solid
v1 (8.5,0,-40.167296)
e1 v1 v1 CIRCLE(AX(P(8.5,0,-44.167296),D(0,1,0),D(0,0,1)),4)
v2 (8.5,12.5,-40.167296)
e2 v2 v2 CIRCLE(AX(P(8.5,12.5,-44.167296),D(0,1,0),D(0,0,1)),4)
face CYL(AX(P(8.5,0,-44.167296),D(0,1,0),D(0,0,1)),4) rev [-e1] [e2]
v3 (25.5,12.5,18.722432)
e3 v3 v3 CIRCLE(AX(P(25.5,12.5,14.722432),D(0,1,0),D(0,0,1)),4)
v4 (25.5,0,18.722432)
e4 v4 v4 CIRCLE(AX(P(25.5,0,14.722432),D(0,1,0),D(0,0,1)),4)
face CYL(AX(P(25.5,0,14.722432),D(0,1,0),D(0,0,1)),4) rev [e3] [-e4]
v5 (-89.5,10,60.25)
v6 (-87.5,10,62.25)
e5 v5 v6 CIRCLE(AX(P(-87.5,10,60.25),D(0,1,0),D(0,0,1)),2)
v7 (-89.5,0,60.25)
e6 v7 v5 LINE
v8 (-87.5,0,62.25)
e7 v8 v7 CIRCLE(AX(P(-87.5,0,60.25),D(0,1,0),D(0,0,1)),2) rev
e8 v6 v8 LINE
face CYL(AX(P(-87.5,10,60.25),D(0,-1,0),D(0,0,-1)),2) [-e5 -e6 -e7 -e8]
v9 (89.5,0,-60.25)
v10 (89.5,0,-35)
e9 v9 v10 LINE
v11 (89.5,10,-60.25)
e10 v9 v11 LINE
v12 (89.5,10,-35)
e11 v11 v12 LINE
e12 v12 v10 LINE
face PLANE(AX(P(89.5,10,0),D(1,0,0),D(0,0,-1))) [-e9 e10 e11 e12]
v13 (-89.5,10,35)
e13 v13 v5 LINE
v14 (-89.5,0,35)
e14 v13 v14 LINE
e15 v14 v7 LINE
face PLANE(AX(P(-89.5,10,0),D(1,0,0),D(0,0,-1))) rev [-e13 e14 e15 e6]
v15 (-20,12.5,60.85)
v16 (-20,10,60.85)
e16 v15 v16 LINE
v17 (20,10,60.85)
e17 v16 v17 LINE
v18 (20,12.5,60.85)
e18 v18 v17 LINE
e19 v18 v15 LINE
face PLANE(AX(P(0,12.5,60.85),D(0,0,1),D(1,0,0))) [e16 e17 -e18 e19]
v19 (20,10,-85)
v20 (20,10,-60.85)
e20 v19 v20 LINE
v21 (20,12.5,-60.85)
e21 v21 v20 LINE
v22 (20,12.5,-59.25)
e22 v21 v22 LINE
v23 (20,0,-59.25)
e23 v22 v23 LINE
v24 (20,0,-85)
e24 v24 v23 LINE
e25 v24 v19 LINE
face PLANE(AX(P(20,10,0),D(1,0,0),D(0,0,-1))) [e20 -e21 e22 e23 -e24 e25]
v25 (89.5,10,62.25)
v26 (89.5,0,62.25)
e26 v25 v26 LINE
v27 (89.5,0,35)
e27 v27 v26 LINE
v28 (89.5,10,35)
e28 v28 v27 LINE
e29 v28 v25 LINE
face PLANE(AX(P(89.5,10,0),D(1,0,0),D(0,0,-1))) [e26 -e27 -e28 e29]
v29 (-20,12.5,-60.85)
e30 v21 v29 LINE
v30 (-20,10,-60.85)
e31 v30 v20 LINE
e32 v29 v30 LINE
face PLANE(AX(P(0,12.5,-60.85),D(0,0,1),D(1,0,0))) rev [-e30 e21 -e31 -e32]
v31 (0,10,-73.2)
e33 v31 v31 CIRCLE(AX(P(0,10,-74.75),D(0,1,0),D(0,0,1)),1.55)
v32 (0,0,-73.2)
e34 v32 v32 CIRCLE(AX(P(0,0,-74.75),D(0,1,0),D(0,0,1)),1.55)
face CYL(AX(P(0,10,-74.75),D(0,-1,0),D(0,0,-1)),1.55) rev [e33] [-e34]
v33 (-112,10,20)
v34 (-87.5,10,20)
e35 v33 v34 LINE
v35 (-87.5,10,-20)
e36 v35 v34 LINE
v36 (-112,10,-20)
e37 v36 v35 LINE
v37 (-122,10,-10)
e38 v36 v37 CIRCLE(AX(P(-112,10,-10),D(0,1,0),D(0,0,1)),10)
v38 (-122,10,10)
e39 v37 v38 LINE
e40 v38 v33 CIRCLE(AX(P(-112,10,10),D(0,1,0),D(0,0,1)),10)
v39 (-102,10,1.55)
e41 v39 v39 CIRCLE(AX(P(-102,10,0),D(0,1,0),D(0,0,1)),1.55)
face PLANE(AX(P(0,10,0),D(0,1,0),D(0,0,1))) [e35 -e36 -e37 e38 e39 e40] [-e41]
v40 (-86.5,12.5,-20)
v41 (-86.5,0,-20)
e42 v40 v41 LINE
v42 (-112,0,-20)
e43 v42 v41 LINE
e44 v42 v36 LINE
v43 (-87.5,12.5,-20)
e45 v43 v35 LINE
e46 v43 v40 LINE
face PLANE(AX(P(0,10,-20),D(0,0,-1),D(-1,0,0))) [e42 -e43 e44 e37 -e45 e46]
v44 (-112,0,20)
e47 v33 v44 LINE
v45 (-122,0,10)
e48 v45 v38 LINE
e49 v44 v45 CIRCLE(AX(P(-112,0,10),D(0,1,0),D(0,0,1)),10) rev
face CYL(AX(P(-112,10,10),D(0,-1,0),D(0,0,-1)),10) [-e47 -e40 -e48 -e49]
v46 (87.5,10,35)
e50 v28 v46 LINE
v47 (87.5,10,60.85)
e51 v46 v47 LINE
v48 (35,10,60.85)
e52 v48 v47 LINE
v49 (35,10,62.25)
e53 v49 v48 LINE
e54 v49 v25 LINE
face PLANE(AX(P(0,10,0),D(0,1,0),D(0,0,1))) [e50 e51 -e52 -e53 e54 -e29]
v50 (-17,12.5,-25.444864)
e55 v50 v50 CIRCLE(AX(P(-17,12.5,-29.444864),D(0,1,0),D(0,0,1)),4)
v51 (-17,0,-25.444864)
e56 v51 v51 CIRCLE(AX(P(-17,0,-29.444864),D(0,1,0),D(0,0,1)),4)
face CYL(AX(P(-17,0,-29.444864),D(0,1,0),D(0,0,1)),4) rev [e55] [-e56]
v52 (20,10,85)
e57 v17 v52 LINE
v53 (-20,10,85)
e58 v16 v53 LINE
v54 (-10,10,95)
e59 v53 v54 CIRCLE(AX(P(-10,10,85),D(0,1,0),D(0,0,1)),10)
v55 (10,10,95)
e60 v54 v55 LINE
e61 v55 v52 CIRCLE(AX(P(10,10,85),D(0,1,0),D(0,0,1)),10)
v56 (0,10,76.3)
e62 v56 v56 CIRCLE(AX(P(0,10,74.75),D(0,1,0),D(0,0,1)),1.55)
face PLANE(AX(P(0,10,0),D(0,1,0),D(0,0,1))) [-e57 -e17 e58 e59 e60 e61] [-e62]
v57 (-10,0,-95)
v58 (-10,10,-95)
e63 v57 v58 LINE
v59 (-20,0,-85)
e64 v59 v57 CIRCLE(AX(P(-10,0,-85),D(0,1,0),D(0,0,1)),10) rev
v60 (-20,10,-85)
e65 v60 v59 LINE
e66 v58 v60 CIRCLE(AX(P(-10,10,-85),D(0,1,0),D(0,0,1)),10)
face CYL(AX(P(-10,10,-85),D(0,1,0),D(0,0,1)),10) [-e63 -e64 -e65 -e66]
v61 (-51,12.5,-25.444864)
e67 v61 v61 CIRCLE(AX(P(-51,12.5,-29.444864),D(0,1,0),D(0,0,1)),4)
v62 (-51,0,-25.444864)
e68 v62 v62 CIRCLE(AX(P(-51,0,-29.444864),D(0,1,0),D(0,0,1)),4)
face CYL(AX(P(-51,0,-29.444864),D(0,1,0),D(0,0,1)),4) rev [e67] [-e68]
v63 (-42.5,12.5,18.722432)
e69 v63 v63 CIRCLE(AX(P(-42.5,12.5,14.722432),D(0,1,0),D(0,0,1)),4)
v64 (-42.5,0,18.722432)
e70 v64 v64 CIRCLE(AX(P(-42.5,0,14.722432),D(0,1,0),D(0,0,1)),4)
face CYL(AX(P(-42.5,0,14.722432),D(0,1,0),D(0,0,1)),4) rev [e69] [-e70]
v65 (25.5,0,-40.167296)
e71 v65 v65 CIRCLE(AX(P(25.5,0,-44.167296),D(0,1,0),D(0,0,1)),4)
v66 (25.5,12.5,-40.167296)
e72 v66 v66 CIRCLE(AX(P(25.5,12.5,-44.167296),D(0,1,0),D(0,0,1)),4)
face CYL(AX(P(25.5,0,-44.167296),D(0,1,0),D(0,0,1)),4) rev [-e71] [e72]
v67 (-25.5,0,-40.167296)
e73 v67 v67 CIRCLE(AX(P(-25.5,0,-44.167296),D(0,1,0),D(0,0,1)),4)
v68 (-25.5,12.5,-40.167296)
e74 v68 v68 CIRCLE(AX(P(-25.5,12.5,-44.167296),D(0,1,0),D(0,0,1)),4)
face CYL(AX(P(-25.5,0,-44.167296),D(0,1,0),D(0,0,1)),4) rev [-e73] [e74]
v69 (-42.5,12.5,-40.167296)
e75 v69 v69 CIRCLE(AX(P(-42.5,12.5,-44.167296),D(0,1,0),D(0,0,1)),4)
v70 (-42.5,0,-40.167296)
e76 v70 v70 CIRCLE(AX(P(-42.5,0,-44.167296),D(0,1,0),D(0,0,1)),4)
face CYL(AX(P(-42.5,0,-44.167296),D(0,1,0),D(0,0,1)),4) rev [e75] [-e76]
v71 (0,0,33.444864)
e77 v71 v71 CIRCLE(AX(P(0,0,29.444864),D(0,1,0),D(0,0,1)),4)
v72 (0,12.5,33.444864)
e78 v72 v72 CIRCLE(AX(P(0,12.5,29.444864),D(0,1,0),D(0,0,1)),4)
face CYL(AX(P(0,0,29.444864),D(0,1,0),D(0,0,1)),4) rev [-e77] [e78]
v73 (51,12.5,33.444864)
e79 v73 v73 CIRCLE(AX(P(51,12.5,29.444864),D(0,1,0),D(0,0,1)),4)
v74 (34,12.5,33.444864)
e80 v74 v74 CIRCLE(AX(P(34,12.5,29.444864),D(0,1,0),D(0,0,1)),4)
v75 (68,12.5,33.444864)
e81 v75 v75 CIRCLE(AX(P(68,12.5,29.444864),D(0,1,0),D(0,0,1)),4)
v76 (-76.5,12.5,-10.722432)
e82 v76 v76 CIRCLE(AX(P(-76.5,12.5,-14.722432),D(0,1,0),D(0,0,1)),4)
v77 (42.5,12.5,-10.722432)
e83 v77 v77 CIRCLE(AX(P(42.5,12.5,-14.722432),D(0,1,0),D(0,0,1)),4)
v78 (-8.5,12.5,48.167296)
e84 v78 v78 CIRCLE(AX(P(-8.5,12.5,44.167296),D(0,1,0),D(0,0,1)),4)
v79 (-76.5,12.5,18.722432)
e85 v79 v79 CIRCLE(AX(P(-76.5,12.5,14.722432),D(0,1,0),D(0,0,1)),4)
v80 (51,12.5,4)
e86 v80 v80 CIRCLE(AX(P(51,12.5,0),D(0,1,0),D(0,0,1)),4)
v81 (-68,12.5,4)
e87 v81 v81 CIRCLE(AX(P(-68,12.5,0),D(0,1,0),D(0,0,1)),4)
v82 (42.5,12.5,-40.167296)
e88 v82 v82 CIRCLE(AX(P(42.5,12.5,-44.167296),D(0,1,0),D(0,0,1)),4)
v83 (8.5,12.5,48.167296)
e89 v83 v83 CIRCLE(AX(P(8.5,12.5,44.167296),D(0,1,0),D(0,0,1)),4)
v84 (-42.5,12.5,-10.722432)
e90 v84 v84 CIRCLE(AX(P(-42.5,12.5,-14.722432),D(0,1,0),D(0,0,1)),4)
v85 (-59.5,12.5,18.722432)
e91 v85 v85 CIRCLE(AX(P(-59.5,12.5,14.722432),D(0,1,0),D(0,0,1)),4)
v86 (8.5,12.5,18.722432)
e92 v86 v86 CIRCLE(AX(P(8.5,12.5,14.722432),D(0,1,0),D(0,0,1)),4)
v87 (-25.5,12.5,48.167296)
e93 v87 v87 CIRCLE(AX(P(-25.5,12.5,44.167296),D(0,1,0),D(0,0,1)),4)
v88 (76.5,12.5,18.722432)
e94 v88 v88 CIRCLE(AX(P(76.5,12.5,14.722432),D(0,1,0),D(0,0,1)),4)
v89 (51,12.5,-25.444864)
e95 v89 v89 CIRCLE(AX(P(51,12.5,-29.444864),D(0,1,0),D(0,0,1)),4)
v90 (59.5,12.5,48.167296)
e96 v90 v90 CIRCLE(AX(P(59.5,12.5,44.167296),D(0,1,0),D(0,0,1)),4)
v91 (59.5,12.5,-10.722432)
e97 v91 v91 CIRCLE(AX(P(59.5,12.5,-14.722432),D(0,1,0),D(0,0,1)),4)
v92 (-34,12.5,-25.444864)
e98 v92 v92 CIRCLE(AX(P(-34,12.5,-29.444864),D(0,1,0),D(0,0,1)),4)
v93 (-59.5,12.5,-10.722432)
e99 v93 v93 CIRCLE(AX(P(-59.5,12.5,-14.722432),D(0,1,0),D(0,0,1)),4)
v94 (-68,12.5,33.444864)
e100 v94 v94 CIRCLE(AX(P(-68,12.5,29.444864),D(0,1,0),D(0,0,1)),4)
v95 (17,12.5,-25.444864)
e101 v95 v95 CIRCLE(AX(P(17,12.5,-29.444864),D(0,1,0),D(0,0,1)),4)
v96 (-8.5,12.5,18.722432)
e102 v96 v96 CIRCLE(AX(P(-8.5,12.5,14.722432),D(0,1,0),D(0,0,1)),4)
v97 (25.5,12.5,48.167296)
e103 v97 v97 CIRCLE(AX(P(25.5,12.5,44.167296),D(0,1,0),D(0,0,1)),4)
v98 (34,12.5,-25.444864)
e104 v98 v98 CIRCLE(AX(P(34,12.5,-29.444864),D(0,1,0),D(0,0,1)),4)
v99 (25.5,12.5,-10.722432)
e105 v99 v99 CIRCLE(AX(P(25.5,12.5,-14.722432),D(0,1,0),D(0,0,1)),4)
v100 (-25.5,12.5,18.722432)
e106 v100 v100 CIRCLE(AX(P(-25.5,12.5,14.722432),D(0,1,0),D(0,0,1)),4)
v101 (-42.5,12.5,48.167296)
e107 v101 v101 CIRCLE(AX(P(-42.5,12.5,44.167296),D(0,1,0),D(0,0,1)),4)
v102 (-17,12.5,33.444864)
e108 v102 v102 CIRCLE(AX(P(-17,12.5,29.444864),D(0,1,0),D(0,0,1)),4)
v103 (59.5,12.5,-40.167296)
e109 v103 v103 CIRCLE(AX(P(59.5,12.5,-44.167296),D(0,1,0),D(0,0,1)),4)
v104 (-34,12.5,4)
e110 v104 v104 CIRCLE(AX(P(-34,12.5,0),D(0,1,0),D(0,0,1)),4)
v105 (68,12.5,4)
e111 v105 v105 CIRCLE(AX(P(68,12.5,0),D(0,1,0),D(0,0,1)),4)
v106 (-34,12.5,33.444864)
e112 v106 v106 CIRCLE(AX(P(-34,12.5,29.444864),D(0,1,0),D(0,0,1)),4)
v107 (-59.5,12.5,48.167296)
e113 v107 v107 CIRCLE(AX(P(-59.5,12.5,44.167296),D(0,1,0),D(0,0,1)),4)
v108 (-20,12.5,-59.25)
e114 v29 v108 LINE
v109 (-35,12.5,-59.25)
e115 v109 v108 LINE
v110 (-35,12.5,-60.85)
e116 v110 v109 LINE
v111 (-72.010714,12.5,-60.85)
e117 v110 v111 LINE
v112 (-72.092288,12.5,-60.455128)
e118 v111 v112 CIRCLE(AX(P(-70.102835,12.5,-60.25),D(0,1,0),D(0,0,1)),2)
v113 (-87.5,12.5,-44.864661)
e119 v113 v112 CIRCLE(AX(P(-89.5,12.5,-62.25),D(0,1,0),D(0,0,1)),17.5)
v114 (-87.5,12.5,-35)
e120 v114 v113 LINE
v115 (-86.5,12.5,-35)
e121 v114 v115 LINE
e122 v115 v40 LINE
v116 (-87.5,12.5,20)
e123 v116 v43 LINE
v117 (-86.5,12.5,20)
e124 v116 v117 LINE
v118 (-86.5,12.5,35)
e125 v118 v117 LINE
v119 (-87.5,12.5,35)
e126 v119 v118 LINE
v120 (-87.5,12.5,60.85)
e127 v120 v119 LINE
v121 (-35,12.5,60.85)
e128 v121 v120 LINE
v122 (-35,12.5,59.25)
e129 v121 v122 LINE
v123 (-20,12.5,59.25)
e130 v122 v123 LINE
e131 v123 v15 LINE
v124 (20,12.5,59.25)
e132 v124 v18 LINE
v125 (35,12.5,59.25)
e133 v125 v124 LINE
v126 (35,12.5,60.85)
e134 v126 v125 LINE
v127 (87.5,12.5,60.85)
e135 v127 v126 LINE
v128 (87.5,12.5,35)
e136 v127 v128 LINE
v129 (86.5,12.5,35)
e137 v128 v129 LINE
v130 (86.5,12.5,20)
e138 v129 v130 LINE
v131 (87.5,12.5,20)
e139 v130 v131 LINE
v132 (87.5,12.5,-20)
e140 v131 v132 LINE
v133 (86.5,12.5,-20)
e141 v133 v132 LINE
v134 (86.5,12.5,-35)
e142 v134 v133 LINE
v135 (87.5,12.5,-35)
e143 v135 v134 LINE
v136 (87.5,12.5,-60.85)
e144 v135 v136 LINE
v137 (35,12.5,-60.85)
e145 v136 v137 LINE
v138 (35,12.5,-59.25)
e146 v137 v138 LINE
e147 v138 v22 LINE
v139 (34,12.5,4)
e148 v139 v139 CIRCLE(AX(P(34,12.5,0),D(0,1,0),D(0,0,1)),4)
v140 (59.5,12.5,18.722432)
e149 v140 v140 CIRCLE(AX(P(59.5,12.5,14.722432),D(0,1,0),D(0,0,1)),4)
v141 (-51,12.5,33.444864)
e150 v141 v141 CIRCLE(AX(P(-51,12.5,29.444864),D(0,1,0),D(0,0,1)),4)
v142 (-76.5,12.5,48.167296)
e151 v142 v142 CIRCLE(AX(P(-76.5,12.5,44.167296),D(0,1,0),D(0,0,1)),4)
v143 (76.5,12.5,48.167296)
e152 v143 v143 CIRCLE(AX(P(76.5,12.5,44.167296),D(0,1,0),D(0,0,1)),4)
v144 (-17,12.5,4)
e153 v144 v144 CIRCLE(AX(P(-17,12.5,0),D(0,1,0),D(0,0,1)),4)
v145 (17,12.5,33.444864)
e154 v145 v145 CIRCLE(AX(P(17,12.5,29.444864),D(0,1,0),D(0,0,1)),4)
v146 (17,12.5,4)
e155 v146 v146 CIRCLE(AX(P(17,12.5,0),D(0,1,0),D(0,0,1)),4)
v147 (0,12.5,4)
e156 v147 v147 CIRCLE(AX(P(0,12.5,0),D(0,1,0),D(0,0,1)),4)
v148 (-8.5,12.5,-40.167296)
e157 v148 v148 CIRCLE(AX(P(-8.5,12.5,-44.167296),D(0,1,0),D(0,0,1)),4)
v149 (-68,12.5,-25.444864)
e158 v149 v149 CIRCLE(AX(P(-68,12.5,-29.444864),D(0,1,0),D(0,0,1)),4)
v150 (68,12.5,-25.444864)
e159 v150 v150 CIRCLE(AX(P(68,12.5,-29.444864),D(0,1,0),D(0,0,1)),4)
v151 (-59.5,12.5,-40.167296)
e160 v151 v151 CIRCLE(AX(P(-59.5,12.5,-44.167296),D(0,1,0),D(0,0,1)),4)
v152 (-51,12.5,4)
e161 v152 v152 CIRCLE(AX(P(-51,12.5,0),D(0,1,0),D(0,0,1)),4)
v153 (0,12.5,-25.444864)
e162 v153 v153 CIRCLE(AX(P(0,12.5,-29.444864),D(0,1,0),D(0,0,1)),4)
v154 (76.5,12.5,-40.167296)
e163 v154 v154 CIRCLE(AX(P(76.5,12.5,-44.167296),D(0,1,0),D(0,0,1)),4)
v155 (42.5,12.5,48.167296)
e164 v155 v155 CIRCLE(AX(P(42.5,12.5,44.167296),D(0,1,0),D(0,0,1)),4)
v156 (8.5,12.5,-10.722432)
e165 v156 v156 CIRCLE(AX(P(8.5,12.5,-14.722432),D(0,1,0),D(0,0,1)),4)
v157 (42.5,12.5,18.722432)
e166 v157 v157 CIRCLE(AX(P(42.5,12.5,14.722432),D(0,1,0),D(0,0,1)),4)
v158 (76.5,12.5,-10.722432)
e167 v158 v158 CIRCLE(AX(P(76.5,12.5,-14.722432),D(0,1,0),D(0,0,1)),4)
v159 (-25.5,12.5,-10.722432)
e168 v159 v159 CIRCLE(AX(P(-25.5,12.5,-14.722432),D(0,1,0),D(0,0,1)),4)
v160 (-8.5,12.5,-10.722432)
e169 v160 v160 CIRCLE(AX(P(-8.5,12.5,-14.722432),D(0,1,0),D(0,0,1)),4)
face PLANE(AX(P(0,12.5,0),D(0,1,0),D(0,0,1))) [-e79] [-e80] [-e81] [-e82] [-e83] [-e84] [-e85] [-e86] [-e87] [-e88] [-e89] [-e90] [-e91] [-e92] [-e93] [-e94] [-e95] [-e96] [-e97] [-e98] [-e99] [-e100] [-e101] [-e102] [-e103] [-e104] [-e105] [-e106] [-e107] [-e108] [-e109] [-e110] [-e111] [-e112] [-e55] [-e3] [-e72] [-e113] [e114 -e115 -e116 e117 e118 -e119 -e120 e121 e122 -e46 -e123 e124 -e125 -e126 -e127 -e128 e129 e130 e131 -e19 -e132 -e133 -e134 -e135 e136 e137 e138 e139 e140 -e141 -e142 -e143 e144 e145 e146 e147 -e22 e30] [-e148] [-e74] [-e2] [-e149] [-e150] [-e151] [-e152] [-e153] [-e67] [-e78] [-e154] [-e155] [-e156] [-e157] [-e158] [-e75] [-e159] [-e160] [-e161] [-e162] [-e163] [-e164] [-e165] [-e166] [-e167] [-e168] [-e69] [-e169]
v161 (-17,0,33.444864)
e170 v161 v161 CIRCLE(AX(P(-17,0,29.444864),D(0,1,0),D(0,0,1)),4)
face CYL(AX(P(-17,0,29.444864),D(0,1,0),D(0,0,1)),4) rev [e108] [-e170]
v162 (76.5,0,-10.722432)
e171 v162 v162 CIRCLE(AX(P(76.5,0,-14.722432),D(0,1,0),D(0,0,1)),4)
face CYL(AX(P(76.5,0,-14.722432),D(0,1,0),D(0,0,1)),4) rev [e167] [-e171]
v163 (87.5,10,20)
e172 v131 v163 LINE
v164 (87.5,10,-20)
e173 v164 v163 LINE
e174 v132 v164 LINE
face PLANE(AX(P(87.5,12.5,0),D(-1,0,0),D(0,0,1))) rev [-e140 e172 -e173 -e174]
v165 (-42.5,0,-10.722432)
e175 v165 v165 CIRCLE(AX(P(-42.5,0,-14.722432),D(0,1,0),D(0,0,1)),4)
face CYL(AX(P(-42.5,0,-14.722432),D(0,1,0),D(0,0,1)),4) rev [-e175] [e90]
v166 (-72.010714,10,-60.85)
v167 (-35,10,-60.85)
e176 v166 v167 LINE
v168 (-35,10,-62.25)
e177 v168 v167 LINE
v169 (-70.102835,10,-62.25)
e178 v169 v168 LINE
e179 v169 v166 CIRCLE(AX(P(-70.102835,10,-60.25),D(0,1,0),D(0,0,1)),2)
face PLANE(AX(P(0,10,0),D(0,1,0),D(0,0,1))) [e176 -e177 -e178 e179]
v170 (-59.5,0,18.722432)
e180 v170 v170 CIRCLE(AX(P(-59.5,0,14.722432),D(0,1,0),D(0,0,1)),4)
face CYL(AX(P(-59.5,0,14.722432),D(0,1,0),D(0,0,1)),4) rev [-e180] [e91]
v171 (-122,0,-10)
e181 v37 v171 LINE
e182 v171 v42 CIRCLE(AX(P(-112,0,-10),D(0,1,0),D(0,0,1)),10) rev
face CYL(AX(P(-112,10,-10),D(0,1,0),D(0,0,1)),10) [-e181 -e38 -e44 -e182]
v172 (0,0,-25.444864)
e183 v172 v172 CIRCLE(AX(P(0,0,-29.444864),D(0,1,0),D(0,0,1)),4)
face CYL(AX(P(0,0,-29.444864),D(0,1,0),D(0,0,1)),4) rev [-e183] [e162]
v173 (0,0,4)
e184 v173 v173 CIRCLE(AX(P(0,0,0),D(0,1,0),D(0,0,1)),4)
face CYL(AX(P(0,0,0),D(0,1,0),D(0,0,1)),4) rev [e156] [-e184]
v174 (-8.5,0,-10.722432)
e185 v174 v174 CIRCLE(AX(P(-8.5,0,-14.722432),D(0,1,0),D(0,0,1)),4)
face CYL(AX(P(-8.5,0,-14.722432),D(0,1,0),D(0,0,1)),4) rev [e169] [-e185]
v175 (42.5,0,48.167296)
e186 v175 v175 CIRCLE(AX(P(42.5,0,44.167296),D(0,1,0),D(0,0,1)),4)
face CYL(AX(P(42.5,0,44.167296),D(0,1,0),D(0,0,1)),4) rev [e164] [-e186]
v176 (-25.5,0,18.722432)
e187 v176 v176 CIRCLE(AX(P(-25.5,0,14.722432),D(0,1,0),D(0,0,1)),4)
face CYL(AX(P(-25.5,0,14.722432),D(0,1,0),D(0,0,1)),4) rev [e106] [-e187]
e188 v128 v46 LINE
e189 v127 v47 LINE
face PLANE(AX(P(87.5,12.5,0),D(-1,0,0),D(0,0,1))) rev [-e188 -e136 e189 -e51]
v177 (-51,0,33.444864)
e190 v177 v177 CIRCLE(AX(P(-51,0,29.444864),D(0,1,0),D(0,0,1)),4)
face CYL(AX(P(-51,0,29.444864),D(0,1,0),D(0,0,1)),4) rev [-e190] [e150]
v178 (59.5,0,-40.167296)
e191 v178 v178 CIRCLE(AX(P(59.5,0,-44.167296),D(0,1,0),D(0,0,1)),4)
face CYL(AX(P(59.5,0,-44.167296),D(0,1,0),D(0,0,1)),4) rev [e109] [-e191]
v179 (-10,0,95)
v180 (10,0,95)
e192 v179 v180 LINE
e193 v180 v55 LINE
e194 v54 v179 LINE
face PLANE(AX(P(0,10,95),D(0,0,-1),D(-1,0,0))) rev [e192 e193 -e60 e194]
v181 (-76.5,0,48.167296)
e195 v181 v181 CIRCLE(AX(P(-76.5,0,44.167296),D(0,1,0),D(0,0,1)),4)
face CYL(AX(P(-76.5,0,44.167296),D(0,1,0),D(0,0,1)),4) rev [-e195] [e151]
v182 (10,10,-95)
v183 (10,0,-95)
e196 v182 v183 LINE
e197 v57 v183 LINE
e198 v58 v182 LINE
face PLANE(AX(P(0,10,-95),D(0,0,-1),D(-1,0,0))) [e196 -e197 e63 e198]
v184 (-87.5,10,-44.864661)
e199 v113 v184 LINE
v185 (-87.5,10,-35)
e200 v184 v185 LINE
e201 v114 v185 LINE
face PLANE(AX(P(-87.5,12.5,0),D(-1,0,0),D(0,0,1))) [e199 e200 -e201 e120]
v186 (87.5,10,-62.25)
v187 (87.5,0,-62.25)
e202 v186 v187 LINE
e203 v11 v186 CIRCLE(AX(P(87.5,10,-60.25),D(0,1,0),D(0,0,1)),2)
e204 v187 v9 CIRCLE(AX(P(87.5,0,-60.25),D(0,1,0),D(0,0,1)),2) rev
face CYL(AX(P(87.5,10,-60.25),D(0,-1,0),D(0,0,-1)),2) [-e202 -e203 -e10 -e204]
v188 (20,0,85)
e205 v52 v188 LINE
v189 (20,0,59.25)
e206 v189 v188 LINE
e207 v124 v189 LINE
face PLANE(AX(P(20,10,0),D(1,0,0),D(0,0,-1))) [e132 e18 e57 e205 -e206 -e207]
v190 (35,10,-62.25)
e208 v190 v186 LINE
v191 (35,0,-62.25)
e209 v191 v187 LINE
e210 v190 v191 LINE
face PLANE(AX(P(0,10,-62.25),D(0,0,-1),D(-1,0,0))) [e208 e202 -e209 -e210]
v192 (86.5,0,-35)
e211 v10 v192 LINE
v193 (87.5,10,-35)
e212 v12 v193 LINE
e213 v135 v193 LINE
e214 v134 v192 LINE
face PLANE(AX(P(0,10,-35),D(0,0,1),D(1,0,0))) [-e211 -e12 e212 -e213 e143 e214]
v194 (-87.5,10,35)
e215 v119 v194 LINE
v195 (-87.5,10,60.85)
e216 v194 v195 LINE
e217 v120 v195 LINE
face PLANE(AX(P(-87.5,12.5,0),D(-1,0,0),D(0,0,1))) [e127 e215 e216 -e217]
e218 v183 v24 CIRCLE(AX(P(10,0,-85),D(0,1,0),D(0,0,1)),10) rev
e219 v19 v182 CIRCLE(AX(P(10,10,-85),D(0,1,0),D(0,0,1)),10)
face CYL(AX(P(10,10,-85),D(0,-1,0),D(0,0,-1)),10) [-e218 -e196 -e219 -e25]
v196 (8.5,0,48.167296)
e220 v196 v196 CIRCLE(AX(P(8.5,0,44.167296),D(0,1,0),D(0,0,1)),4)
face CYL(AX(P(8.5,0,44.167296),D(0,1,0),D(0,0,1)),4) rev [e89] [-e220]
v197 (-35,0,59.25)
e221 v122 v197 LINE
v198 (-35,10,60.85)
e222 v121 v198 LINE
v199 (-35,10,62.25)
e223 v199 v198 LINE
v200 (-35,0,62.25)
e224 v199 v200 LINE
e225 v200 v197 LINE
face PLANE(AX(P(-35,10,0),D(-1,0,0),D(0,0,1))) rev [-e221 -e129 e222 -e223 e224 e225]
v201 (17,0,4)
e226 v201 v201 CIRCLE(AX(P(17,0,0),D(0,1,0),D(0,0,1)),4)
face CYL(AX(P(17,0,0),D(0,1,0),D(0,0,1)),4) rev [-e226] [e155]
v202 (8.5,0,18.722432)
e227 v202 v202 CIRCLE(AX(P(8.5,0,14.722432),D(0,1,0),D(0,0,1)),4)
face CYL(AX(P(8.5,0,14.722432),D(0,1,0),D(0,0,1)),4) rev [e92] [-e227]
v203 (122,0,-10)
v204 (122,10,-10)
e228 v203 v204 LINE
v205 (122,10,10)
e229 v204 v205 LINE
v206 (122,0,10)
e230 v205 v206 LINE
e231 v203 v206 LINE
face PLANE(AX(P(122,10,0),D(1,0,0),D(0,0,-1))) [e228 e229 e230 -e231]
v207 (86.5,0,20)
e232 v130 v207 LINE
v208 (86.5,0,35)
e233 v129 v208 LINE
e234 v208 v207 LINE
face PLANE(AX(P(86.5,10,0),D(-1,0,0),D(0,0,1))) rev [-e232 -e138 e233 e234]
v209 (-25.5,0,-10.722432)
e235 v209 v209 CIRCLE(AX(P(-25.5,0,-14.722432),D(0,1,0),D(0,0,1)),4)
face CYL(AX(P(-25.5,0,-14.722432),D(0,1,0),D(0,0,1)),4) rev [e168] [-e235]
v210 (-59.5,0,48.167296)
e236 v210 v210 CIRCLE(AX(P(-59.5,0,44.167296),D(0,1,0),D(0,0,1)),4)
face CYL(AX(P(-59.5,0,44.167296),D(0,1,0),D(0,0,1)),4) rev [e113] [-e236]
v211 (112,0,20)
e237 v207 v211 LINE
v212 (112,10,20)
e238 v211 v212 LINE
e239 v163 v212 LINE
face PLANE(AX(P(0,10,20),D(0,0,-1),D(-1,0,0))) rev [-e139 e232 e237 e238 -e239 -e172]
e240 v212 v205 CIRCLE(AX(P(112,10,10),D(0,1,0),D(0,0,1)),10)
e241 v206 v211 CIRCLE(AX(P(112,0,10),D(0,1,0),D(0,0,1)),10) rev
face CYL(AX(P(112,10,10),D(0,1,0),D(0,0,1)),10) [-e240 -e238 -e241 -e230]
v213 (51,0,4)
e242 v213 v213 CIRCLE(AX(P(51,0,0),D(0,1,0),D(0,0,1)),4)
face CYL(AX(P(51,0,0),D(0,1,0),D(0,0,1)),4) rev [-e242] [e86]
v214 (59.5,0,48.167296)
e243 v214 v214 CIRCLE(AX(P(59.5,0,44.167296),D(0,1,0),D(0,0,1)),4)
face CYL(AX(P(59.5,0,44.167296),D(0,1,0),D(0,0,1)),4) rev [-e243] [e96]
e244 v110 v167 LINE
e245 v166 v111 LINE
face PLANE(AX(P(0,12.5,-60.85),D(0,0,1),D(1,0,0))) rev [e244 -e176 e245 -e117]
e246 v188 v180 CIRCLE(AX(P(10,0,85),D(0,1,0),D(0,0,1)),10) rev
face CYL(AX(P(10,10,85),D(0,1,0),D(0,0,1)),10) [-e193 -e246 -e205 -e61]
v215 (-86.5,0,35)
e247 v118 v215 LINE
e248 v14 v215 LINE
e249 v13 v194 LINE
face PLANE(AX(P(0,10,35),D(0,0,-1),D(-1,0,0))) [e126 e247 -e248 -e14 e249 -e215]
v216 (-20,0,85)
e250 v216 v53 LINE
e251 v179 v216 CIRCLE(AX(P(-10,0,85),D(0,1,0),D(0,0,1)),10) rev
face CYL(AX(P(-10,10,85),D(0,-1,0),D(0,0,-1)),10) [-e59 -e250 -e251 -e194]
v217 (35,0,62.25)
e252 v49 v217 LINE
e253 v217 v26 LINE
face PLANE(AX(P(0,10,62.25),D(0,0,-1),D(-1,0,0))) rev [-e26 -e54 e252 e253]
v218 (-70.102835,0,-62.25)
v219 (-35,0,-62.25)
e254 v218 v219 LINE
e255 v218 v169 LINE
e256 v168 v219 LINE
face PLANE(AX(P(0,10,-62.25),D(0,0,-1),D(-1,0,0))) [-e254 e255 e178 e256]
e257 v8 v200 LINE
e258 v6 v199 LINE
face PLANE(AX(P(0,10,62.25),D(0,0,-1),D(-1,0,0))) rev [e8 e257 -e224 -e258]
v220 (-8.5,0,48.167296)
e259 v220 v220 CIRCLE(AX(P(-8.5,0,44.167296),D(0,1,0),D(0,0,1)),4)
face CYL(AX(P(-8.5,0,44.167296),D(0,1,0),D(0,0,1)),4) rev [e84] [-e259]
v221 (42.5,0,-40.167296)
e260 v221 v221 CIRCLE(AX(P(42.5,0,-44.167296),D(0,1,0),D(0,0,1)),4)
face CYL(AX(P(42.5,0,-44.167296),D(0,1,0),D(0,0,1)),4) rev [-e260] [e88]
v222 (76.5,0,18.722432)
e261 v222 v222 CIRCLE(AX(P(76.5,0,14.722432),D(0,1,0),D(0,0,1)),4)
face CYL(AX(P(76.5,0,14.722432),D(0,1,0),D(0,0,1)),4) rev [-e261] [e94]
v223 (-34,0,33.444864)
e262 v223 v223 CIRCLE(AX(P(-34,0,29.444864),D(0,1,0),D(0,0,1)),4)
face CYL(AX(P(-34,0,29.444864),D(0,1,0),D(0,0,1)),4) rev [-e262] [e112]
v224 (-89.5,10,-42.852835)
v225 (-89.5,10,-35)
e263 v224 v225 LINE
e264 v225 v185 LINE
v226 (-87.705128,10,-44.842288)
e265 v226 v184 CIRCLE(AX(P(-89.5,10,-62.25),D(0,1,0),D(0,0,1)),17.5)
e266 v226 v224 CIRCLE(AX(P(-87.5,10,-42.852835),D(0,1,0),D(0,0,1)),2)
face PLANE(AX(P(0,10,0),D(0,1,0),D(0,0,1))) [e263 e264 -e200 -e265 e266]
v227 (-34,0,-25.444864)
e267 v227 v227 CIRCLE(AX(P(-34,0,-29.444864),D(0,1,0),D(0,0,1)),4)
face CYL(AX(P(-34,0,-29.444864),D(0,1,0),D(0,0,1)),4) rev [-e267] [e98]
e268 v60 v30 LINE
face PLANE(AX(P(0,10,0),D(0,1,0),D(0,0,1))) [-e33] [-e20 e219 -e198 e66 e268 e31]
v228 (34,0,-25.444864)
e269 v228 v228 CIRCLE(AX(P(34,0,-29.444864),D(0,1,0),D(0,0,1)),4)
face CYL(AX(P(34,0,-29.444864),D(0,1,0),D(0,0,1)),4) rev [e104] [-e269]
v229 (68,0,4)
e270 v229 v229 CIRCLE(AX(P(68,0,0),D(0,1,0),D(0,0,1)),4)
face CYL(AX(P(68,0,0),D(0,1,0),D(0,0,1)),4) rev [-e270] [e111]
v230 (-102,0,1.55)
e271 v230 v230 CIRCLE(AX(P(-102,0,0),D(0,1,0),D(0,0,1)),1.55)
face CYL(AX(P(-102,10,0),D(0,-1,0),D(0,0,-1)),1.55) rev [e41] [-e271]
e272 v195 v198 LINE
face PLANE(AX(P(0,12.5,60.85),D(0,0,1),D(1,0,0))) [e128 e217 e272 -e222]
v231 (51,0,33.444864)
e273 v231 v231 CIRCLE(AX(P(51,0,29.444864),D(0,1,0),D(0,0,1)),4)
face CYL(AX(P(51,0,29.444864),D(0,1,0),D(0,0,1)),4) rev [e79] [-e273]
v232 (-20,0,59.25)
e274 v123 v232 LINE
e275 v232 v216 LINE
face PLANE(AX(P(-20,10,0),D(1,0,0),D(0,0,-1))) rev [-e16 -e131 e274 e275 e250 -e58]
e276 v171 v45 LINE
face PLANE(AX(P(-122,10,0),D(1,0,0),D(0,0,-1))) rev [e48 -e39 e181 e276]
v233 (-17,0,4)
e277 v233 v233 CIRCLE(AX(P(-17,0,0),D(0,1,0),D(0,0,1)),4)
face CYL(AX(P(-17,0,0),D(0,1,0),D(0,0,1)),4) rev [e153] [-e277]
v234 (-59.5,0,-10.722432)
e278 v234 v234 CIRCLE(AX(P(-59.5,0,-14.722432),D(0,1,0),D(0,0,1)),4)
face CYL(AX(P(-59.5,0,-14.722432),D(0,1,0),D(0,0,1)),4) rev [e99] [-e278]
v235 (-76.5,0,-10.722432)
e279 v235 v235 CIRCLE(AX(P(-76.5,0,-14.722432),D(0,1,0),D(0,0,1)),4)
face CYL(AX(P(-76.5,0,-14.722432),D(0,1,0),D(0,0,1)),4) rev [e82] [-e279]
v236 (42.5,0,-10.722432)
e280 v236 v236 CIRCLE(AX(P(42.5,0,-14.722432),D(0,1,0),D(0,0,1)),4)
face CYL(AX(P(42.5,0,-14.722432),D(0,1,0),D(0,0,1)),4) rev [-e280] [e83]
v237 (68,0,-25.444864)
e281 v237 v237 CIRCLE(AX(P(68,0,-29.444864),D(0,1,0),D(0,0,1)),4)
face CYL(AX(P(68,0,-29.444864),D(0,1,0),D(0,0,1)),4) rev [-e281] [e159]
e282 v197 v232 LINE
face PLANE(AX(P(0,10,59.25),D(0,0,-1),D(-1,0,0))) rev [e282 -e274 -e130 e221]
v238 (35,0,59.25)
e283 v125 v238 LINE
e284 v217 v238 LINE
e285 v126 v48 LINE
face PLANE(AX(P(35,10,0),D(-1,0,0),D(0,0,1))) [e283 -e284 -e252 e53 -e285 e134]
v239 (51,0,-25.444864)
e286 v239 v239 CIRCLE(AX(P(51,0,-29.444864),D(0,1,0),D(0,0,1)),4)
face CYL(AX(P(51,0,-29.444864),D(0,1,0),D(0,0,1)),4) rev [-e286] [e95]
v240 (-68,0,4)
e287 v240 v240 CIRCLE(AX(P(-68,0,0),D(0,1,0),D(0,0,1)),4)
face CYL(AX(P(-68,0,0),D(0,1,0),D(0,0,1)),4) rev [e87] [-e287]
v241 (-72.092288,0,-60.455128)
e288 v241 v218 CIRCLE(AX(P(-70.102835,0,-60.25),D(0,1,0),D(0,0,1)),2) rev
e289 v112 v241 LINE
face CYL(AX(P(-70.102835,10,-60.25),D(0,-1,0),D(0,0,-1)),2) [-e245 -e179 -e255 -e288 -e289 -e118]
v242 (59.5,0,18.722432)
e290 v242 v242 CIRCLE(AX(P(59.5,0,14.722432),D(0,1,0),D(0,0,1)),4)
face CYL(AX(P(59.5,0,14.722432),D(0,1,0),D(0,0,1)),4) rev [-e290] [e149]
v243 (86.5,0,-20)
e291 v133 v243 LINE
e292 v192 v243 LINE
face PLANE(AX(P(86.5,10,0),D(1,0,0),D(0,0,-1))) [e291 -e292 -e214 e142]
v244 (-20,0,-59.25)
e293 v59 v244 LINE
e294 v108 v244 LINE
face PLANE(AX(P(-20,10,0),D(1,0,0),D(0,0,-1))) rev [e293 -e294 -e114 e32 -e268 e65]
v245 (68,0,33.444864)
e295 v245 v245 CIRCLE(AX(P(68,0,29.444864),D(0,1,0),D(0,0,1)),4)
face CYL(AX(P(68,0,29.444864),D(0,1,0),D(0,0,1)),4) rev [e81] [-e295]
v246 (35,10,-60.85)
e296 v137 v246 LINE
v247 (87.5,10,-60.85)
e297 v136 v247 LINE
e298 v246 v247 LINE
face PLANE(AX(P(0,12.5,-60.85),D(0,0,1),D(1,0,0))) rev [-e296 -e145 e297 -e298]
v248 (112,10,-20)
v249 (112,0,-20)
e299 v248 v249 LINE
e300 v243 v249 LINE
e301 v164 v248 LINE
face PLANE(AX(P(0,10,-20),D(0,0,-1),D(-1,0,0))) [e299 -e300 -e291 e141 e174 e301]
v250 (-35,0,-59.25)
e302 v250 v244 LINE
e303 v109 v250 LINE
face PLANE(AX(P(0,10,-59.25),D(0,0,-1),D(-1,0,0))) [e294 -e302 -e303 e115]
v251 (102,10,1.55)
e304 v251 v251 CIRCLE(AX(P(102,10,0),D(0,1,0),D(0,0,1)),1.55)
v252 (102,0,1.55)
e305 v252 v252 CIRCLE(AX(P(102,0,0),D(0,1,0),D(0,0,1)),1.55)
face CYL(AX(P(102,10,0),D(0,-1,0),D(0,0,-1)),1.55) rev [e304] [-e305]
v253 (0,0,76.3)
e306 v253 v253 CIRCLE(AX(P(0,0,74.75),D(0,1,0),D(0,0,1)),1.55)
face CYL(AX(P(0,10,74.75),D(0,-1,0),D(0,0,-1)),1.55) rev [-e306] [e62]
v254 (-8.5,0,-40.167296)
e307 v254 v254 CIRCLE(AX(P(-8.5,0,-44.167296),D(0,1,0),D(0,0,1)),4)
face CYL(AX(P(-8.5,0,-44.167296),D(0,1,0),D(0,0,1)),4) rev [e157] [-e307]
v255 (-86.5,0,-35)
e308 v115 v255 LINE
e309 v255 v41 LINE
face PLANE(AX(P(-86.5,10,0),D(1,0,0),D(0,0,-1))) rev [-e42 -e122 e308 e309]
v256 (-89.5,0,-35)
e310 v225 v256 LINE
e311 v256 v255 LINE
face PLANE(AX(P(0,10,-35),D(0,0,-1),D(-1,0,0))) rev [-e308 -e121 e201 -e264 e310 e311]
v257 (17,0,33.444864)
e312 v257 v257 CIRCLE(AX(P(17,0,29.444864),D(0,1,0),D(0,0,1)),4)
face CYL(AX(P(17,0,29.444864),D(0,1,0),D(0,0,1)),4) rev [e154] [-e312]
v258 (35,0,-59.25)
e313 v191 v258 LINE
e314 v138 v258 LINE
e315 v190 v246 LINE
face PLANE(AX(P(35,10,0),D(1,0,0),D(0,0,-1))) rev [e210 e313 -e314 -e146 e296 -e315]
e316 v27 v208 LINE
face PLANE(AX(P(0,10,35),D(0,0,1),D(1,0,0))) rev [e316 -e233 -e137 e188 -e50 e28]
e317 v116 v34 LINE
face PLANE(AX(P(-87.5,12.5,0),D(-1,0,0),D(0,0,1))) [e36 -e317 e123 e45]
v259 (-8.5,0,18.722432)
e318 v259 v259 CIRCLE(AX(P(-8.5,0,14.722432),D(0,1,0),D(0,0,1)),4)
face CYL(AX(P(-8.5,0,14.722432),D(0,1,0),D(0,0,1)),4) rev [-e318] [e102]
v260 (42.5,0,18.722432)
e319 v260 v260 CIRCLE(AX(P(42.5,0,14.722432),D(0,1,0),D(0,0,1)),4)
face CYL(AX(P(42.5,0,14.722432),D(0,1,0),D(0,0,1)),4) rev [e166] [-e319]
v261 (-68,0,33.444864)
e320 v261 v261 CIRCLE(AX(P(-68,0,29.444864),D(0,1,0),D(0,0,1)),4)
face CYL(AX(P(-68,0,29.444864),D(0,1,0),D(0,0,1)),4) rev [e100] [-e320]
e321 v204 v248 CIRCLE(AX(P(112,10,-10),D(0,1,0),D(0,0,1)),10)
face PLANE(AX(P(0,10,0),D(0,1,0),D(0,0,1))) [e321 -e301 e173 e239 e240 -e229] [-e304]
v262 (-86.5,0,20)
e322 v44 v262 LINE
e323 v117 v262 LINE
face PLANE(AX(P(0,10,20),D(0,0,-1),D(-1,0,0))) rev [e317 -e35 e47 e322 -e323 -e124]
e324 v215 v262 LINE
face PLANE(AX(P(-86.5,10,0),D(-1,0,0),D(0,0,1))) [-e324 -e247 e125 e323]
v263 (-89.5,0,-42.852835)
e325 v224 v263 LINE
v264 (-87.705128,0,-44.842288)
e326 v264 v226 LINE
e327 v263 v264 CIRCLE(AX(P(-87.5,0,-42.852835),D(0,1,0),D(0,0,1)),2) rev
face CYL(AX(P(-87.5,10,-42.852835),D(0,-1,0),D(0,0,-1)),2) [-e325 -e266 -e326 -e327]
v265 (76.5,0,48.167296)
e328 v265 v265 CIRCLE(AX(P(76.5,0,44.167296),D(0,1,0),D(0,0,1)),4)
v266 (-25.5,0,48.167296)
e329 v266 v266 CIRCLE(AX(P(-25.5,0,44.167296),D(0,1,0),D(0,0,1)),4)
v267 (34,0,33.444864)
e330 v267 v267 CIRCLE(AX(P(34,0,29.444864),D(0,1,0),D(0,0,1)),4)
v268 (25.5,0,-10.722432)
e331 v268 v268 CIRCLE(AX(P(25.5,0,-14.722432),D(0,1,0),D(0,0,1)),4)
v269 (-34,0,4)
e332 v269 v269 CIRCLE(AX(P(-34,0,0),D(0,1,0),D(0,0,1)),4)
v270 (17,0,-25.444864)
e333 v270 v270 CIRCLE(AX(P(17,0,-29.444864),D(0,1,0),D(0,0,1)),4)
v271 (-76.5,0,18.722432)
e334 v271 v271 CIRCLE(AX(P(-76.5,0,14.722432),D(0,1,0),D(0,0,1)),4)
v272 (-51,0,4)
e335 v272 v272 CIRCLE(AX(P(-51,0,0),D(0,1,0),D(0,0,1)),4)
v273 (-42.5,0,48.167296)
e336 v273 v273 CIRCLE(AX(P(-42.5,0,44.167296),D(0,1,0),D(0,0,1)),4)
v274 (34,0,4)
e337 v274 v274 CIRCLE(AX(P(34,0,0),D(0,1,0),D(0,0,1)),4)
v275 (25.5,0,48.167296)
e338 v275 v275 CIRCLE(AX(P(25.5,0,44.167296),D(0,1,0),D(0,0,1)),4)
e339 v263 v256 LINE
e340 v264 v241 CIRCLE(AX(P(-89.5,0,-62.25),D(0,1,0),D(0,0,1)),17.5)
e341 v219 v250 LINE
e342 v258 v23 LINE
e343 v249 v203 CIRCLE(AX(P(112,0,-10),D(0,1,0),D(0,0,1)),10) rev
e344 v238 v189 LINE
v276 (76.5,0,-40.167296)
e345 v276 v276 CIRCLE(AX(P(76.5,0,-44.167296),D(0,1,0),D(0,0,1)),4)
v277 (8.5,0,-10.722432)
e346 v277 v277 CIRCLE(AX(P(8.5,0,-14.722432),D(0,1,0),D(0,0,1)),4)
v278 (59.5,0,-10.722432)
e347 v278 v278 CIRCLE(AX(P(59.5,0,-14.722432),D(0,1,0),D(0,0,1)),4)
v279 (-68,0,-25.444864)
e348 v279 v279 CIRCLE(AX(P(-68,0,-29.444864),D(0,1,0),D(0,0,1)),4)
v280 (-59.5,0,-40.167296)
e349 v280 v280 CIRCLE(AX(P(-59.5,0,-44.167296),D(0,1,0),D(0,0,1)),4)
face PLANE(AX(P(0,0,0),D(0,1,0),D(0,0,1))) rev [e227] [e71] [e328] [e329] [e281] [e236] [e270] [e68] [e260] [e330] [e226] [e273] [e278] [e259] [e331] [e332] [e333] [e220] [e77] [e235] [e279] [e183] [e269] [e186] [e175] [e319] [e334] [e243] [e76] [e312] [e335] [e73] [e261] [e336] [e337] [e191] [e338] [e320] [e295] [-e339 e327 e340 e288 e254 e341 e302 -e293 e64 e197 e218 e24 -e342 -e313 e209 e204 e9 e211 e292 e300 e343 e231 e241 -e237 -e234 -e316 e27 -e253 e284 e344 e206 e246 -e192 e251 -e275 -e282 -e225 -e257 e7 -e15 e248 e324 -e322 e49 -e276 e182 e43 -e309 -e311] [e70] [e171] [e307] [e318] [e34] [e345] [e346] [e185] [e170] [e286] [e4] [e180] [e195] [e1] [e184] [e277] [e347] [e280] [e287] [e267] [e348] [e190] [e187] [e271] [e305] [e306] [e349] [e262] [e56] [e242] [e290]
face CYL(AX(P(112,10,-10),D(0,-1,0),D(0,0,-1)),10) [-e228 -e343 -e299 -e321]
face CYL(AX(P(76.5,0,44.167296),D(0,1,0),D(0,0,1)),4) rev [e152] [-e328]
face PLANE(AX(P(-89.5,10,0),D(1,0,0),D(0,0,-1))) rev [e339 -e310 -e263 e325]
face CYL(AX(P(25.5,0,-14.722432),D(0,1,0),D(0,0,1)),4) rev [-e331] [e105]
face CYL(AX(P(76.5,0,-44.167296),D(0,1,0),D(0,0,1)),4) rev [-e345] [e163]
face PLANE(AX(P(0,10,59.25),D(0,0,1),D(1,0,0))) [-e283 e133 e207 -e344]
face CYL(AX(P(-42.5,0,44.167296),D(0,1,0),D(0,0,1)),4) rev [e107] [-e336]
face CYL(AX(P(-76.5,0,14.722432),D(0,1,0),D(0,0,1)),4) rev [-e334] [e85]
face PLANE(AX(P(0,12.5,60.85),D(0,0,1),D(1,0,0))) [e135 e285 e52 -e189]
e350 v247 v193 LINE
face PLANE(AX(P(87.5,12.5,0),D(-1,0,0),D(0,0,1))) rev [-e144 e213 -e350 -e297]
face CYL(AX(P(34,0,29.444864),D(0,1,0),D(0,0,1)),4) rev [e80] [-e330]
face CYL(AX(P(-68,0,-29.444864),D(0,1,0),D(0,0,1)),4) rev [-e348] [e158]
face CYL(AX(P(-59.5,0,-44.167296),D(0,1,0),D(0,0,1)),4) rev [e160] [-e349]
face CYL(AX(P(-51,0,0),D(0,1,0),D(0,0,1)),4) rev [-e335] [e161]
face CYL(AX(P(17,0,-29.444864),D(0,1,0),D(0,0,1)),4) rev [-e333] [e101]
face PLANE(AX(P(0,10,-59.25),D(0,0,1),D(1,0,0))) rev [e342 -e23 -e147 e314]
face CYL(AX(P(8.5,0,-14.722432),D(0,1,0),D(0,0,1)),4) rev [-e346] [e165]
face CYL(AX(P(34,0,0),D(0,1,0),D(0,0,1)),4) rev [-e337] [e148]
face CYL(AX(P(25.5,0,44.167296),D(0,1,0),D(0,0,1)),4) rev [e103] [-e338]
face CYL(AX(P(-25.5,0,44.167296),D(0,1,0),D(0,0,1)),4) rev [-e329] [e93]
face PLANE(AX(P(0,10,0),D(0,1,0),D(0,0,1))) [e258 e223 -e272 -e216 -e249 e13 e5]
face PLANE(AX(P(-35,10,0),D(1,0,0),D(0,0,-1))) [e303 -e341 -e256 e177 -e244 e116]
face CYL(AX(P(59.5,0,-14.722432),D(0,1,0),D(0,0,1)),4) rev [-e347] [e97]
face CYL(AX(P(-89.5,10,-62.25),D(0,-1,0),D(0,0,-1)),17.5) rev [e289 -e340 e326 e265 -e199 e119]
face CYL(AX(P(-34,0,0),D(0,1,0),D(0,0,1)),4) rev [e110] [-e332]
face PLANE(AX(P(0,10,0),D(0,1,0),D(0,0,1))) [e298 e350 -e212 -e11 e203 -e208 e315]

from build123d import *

# Parameters (mm, degrees)
SKETCH1_W               = 32.5
SKETCH1_H               = 40
SKETCH1_R               = 1.55
SKETCH1_W_2             = 40
SKETCH1_H_2             = 32.75
BOSS_EXTRUDE1_DEPTH     = 10
BOSS_EXTRUDE2_DEPTH     = 12.5
SKETCH3_R               = 4
CUT_EXTRUDE1_DEPTH      = 12.5
FILL_PATTERN1_OUTLINE_R = 4
FILL_PATTERN1_DEPTH     = 12.5
FILLET1_R               = 10
FILLET2_R               = 2


# Read off the part's stored shape, not the designer's step: Fill Pattern1
with BuildPart() as part:
    # Sketch1 → Boss-Extrude1 (new body)
    # profile 1 of 9: a face of its own
    with BuildSketch(Plane(origin=(0, 0, 0), x_dir=(1, 0, 0), z_dir=(0, 1, 0))):
        with BuildLine():
            Line((-35, 62.25), (-72, 62.25))
            ThreePointArc((-72, 62.25), (-77.125631329, 49.875631329), (-89.5, 44.75))
            Line((-89.5, 44.75), (-89.5, 35))
            Line((-89.5, 35), (-86.5, 35))
            Line((-86.5, 35), (-86.5, 20))
            Line((-86.5, 20), (-57, 20))
            Line((-57, 20), (-57, -20))
            Line((-57, -20), (-86.5, -20))
            Line((-86.5, -20), (-86.5, -35))
            Line((-86.5, -35), (-89.5, -35))
            Line((-89.5, -35), (-89.5, -62.25))
            Line((-89.5, -62.25), (-35, -62.25))
            Line((-35, -62.25), (-35, -59.25))
            Line((-35, -59.25), (-20, -59.25))
            Line((-20, -59.25), (-20, -29.5))
            Line((-20, -29.5), (20, -29.5))
            Line((20, -29.5), (20, -59.25))
            Line((20, -59.25), (35, -59.25))
            Line((35, -59.25), (35, -62.25))
            Line((35, -62.25), (89.5, -62.25))
            Line((89.5, -62.25), (89.5, -35))
            Line((89.5, -35), (86.5, -35))
            Line((86.5, -35), (86.5, -20))
            Line((86.5, -20), (57, -20))
            Line((57, -20), (57, 20))
            Line((57, 20), (86.5, 20))
            Line((86.5, 20), (86.5, 35))
            Line((86.5, 35), (89.5, 35))
            Line((89.5, 35), (89.5, 62.25))
            Line((89.5, 62.25), (35, 62.25))
            Line((35, 62.25), (35, 59.25))
            Line((35, 59.25), (20, 59.25))
            Line((20, 59.25), (20, 29.5))
            Line((20, 29.5), (-20, 29.5))
            Line((-20, 29.5), (-20, 59.25))
            Line((-20, 59.25), (-35, 59.25))
            Line((-35, 59.25), (-35, 62.25))
        make_face()
    # profile 2 of 9: a face of its own
    with BuildSketch(Plane(origin=(0, 0, 0), x_dir=(1, 0, 0), z_dir=(0, 1, 0))):
        Polygon((89.5, -20), (89.5, 20), (86.5, 20), (57, 20), (57, -20), (86.5, -20), align=None)
    # profile 3 of 9: a face of its own
    with BuildSketch(Plane(origin=(0, 0, 0), x_dir=(1, 0, 0), z_dir=(0, 1, 0))):
        with Locations((105.75, 0)):
            Rectangle(SKETCH1_W, SKETCH1_H)
        with Locations(Location((102, 0, 0), (0, 0, 270))):
            Circle(SKETCH1_R, mode=Mode.SUBTRACT)
    # profile 4 of 9: a face of its own
    with BuildSketch(Plane(origin=(0, 0, 0), x_dir=(1, 0, 0), z_dir=(0, 1, 0))):
        Polygon((-20, -29.5), (-20, -59.25), (-20, -62.25), (20, -62.25), (20, -59.25), (20, -29.5), align=None)
    # profile 5 of 9: a face of its own
    with BuildSketch(Plane(origin=(0, 0, 0), x_dir=(1, 0, 0), z_dir=(0, 1, 0))):
        with Locations((0, -78.625)):
            Rectangle(SKETCH1_W_2, SKETCH1_H_2)
        with Locations(Location((0, -74.75, 0), (0, 0, 270))):
            Circle(SKETCH1_R, mode=Mode.SUBTRACT)
    # profile 6 of 9: a face of its own
    with BuildSketch(Plane(origin=(0, 0, 0), x_dir=(1, 0, 0), z_dir=(0, 1, 0))):
        Polygon((-86.5, 20), (-89.5, 20), (-89.5, -20), (-86.5, -20), (-57, -20), (-57, 20), align=None)
    # profile 7 of 9: a face of its own
    with BuildSketch(Plane(origin=(0, 0, 0), x_dir=(1, 0, 0), z_dir=(0, 1, 0))):
        with Locations((-105.75, 0)):
            Rectangle(SKETCH1_W, SKETCH1_H)
        with Locations(Location((-102, 0, 0), (0, 0, 270))):
            Circle(SKETCH1_R, mode=Mode.SUBTRACT)
    # profile 8 of 9: a face of its own
    with BuildSketch(Plane(origin=(0, 0, 0), x_dir=(1, 0, 0), z_dir=(0, 1, 0))):
        Polygon((20, 62.25), (-20, 62.25), (-20, 59.25), (-20, 29.5), (20, 29.5), (20, 59.25), align=None)
    # profile 9 of 9: a face of its own
    with BuildSketch(Plane(origin=(0, 0, 0), x_dir=(1, 0, 0), z_dir=(0, 1, 0))):
        with Locations((0, 78.625)):
            Rectangle(SKETCH1_W_2, SKETCH1_H_2)
        with Locations(Location((0, 74.75, 0), (0, 0, 270))):
            Circle(SKETCH1_R, mode=Mode.SUBTRACT)
    extrude(amount=BOSS_EXTRUDE1_DEPTH)

    # Sketch2 → Boss-Extrude2 (add)
    with BuildSketch(Plane(origin=(0, 0, 0), x_dir=(1, 0, 0), z_dir=(0, 1, 0))):
        with BuildLine():
            Line((35, -60.85), (87.5, -60.85))
            Line((87.5, -60.85), (87.5, -35))
            Line((87.5, -35), (86.5, -35))
            Line((86.5, -35), (86.5, -20))
            Line((86.5, -20), (87.5, -20))
            Line((87.5, -20), (87.5, 20))
            Line((87.5, 20), (86.5, 20))
            Line((86.5, 20), (86.5, 35))
            Line((86.5, 35), (87.5, 35))
            Line((87.5, 35), (87.5, 60.85))
            Line((87.5, 60.85), (35, 60.85))
            Line((35, 60.85), (35, 59.25))
            Line((35, 59.25), (20, 59.25))
            Line((20, 59.25), (20, 60.85))
            Line((20, 60.85), (-20, 60.85))
            Line((-20, 60.85), (-20, 59.25))
            Line((-20, 59.25), (-35, 59.25))
            Line((-35, 59.25), (-35, 60.85))
            Line((-35, 60.85), (-72.056089888, 60.85))
            ThreePointArc((-72.056089888, 60.85), (-76.914326674, 50.09060746), (-87.5, 44.864661349))
            Line((-87.5, 44.864661349), (-87.5, 35))
            Line((-87.5, 35), (-86.5, 35))
            Line((-86.5, 35), (-86.5, 20))
            Line((-86.5, 20), (-87.5, 20))
            Line((-87.5, 20), (-87.5, -20))
            Line((-87.5, -20), (-86.5, -20))
            Line((-86.5, -20), (-86.5, -35))
            Line((-86.5, -35), (-87.5, -35))
            Line((-87.5, -35), (-87.5, -60.85))
            Line((-87.5, -60.85), (-35, -60.85))
            Line((-35, -60.85), (-35, -59.25))
            Line((-35, -59.25), (-20, -59.25))
            Line((-20, -59.25), (-20, -60.85))
            Line((-20, -60.85), (20, -60.85))
            Line((20, -60.85), (20, -59.25))
            Line((20, -59.25), (35, -59.25))
            Line((35, -59.25), (35, -60.85))
        make_face()
    extrude(amount=BOSS_EXTRUDE2_DEPTH)

    # Sketch3 → Cut-Extrude1 (cut)
    with BuildSketch(Plane(origin=(0, 12.5, 0), x_dir=(1, 0, 0), z_dir=(0, 1, 0))):
        with Locations(Location((0, 0, 0), (0, 0, 270))):
            Circle(SKETCH3_R)
    extrude(amount=-CUT_EXTRUDE1_DEPTH, mode=Mode.SUBTRACT)

    # Fill Pattern1 outline → Fill Pattern1 (cut)
    with BuildSketch(Plane(origin=(0, 0, 0), x_dir=(1, 0, 0), z_dir=(0, 1, 0))):
        with Locations((76.5, -44.167295593)):
            Circle(FILL_PATTERN1_OUTLINE_R)
        with Locations((34, 29.444863729)):
            Circle(FILL_PATTERN1_OUTLINE_R)
        with Locations((42.5, 44.167295593)):
            Circle(FILL_PATTERN1_OUTLINE_R)
        with Locations((8.5, -44.167295593)):
            Circle(FILL_PATTERN1_OUTLINE_R)
        with Locations((17, -29.444863729)):
            Circle(FILL_PATTERN1_OUTLINE_R)
        with Locations((25.5, -14.722431864)):
            Circle(FILL_PATTERN1_OUTLINE_R)
        with Locations((34, 0)):
            Circle(FILL_PATTERN1_OUTLINE_R)
        with Locations((42.5, 14.722431864)):
            Circle(FILL_PATTERN1_OUTLINE_R)
        with Locations((51, 29.444863729)):
            Circle(FILL_PATTERN1_OUTLINE_R)
        with Locations((-8.5, -44.167295593)):
            Circle(FILL_PATTERN1_OUTLINE_R)
        with Locations((25.5, 44.167295593)):
            Circle(FILL_PATTERN1_OUTLINE_R)
        with Locations((17, 29.444863729)):
            Circle(FILL_PATTERN1_OUTLINE_R)
        with Locations((8.5, 14.722431864)):
            Circle(FILL_PATTERN1_OUTLINE_R)
        with Locations((0, -29.444863729)):
            Circle(FILL_PATTERN1_OUTLINE_R)
        with Locations((8.5, -14.722431864)):
            Circle(FILL_PATTERN1_OUTLINE_R)
        with Locations((17, 0)):
            Circle(FILL_PATTERN1_OUTLINE_R)
        with Locations((25.5, 14.722431864)):
            Circle(FILL_PATTERN1_OUTLINE_R)
        with Locations((42.5, -44.167295593)):
            Circle(FILL_PATTERN1_OUTLINE_R)
        with Locations((51, -29.444863729)):
            Circle(FILL_PATTERN1_OUTLINE_R)
        with Locations((59.5, -14.722431864)):
            Circle(FILL_PATTERN1_OUTLINE_R)
        with Locations((68, 0)):
            Circle(FILL_PATTERN1_OUTLINE_R)
        with Locations((76.5, -14.722431864)):
            Circle(FILL_PATTERN1_OUTLINE_R)
        with Locations((68, -29.444863729)):
            Circle(FILL_PATTERN1_OUTLINE_R)
        with Locations((59.5, -44.167295593)):
            Circle(FILL_PATTERN1_OUTLINE_R)
        with Locations((76.5, 14.722431864)):
            Circle(FILL_PATTERN1_OUTLINE_R)
        with Locations((42.5, -14.722431864)):
            Circle(FILL_PATTERN1_OUTLINE_R)
        with Locations((34, -29.444863729)):
            Circle(FILL_PATTERN1_OUTLINE_R)
        with Locations((25.5, -44.167295593)):
            Circle(FILL_PATTERN1_OUTLINE_R)
        with Locations((59.5, 44.167295593)):
            Circle(FILL_PATTERN1_OUTLINE_R)
        with Locations((51, 0)):
            Circle(FILL_PATTERN1_OUTLINE_R)
        with Locations((59.5, 14.722431864)):
            Circle(FILL_PATTERN1_OUTLINE_R)
        with Locations((68, 29.444863729)):
            Circle(FILL_PATTERN1_OUTLINE_R)
        with Locations((76.5, 44.167295593)):
            Circle(FILL_PATTERN1_OUTLINE_R)
        with Locations((-76.5, -44.167295593)):
            Circle(FILL_PATTERN1_OUTLINE_R)
        with Locations((-68, -29.444863729)):
            Circle(FILL_PATTERN1_OUTLINE_R)
        with Locations((-59.5, -14.722431864)):
            Circle(FILL_PATTERN1_OUTLINE_R)
        with Locations((-51, 0)):
            Circle(FILL_PATTERN1_OUTLINE_R)
        with Locations((-59.5, -44.167295593)):
            Circle(FILL_PATTERN1_OUTLINE_R)
        with Locations((-25.5, 44.167295593)):
            Circle(FILL_PATTERN1_OUTLINE_R)
        with Locations((-34, 29.444863729)):
            Circle(FILL_PATTERN1_OUTLINE_R)
        with Locations((-42.5, 14.722431864)):
            Circle(FILL_PATTERN1_OUTLINE_R)
        with Locations((-76.5, -14.722431864)):
            Circle(FILL_PATTERN1_OUTLINE_R)
        with Locations((-59.5, 44.167295593)):
            Circle(FILL_PATTERN1_OUTLINE_R)
        with Locations((-68, 29.444863729)):
            Circle(FILL_PATTERN1_OUTLINE_R)
        with Locations((-76.5, 14.722431864)):
            Circle(FILL_PATTERN1_OUTLINE_R)
        with Locations((-68, 0)):
            Circle(FILL_PATTERN1_OUTLINE_R)
        with Locations((-59.5, 14.722431864)):
            Circle(FILL_PATTERN1_OUTLINE_R)
        with Locations((-51, 29.444863729)):
            Circle(FILL_PATTERN1_OUTLINE_R)
        with Locations((-42.5, 44.167295593)):
            Circle(FILL_PATTERN1_OUTLINE_R)
        with Locations((-25.5, -14.722431864)):
            Circle(FILL_PATTERN1_OUTLINE_R)
        with Locations((-17, 0)):
            Circle(FILL_PATTERN1_OUTLINE_R)
        with Locations((-8.5, 14.722431864)):
            Circle(FILL_PATTERN1_OUTLINE_R)
        with Locations((0, 29.444863729)):
            Circle(FILL_PATTERN1_OUTLINE_R)
        with Locations((-8.5, -14.722431864)):
            Circle(FILL_PATTERN1_OUTLINE_R)
        with Locations((-17, -29.444863729)):
            Circle(FILL_PATTERN1_OUTLINE_R)
        with Locations((-25.5, -44.167295593)):
            Circle(FILL_PATTERN1_OUTLINE_R)
        with Locations((8.5, 44.167295593)):
            Circle(FILL_PATTERN1_OUTLINE_R)
        with Locations((-51, -29.444863729)):
            Circle(FILL_PATTERN1_OUTLINE_R)
        with Locations((-42.5, -14.722431864)):
            Circle(FILL_PATTERN1_OUTLINE_R)
        with Locations((-34, 0)):
            Circle(FILL_PATTERN1_OUTLINE_R)
        with Locations((-25.5, 14.722431864)):
            Circle(FILL_PATTERN1_OUTLINE_R)
        with Locations((-17, 29.444863729)):
            Circle(FILL_PATTERN1_OUTLINE_R)
        with Locations((-8.5, 44.167295593)):
            Circle(FILL_PATTERN1_OUTLINE_R)
        with Locations((-42.5, -44.167295593)):
            Circle(FILL_PATTERN1_OUTLINE_R)
        with Locations((-34, -29.444863729)):
            Circle(FILL_PATTERN1_OUTLINE_R)
    extrude(amount=FILL_PATTERN1_DEPTH, mode=Mode.SUBTRACT)

    # Fillet1
    fillet1_edges = [part.edges().sort_by_distance(p)[0] for p in [
        (-122, 5, 20),
        (-122, 5, -20),
        (-20, 5, -95),
        (20, 5, -95),
        (122, 5, -20),
        (122, 5, 20),
        (20, 5, 95),
        (-20, 5, 95),
    ]]
    fillet(fillet1_edges, radius=FILLET1_R)

    # Fillet2
    fillet2_edges = [part.edges().sort_by_distance(p)[0] for p in [
        (-89.5, 5, 62.25),
        (-89.5, 5, -44.75),
        (-72, 5, -62.25),
        (89.5, 5, -62.25),
    ]]
    fillet(fillet2_edges, radius=FILLET2_R)


solid = part.part
